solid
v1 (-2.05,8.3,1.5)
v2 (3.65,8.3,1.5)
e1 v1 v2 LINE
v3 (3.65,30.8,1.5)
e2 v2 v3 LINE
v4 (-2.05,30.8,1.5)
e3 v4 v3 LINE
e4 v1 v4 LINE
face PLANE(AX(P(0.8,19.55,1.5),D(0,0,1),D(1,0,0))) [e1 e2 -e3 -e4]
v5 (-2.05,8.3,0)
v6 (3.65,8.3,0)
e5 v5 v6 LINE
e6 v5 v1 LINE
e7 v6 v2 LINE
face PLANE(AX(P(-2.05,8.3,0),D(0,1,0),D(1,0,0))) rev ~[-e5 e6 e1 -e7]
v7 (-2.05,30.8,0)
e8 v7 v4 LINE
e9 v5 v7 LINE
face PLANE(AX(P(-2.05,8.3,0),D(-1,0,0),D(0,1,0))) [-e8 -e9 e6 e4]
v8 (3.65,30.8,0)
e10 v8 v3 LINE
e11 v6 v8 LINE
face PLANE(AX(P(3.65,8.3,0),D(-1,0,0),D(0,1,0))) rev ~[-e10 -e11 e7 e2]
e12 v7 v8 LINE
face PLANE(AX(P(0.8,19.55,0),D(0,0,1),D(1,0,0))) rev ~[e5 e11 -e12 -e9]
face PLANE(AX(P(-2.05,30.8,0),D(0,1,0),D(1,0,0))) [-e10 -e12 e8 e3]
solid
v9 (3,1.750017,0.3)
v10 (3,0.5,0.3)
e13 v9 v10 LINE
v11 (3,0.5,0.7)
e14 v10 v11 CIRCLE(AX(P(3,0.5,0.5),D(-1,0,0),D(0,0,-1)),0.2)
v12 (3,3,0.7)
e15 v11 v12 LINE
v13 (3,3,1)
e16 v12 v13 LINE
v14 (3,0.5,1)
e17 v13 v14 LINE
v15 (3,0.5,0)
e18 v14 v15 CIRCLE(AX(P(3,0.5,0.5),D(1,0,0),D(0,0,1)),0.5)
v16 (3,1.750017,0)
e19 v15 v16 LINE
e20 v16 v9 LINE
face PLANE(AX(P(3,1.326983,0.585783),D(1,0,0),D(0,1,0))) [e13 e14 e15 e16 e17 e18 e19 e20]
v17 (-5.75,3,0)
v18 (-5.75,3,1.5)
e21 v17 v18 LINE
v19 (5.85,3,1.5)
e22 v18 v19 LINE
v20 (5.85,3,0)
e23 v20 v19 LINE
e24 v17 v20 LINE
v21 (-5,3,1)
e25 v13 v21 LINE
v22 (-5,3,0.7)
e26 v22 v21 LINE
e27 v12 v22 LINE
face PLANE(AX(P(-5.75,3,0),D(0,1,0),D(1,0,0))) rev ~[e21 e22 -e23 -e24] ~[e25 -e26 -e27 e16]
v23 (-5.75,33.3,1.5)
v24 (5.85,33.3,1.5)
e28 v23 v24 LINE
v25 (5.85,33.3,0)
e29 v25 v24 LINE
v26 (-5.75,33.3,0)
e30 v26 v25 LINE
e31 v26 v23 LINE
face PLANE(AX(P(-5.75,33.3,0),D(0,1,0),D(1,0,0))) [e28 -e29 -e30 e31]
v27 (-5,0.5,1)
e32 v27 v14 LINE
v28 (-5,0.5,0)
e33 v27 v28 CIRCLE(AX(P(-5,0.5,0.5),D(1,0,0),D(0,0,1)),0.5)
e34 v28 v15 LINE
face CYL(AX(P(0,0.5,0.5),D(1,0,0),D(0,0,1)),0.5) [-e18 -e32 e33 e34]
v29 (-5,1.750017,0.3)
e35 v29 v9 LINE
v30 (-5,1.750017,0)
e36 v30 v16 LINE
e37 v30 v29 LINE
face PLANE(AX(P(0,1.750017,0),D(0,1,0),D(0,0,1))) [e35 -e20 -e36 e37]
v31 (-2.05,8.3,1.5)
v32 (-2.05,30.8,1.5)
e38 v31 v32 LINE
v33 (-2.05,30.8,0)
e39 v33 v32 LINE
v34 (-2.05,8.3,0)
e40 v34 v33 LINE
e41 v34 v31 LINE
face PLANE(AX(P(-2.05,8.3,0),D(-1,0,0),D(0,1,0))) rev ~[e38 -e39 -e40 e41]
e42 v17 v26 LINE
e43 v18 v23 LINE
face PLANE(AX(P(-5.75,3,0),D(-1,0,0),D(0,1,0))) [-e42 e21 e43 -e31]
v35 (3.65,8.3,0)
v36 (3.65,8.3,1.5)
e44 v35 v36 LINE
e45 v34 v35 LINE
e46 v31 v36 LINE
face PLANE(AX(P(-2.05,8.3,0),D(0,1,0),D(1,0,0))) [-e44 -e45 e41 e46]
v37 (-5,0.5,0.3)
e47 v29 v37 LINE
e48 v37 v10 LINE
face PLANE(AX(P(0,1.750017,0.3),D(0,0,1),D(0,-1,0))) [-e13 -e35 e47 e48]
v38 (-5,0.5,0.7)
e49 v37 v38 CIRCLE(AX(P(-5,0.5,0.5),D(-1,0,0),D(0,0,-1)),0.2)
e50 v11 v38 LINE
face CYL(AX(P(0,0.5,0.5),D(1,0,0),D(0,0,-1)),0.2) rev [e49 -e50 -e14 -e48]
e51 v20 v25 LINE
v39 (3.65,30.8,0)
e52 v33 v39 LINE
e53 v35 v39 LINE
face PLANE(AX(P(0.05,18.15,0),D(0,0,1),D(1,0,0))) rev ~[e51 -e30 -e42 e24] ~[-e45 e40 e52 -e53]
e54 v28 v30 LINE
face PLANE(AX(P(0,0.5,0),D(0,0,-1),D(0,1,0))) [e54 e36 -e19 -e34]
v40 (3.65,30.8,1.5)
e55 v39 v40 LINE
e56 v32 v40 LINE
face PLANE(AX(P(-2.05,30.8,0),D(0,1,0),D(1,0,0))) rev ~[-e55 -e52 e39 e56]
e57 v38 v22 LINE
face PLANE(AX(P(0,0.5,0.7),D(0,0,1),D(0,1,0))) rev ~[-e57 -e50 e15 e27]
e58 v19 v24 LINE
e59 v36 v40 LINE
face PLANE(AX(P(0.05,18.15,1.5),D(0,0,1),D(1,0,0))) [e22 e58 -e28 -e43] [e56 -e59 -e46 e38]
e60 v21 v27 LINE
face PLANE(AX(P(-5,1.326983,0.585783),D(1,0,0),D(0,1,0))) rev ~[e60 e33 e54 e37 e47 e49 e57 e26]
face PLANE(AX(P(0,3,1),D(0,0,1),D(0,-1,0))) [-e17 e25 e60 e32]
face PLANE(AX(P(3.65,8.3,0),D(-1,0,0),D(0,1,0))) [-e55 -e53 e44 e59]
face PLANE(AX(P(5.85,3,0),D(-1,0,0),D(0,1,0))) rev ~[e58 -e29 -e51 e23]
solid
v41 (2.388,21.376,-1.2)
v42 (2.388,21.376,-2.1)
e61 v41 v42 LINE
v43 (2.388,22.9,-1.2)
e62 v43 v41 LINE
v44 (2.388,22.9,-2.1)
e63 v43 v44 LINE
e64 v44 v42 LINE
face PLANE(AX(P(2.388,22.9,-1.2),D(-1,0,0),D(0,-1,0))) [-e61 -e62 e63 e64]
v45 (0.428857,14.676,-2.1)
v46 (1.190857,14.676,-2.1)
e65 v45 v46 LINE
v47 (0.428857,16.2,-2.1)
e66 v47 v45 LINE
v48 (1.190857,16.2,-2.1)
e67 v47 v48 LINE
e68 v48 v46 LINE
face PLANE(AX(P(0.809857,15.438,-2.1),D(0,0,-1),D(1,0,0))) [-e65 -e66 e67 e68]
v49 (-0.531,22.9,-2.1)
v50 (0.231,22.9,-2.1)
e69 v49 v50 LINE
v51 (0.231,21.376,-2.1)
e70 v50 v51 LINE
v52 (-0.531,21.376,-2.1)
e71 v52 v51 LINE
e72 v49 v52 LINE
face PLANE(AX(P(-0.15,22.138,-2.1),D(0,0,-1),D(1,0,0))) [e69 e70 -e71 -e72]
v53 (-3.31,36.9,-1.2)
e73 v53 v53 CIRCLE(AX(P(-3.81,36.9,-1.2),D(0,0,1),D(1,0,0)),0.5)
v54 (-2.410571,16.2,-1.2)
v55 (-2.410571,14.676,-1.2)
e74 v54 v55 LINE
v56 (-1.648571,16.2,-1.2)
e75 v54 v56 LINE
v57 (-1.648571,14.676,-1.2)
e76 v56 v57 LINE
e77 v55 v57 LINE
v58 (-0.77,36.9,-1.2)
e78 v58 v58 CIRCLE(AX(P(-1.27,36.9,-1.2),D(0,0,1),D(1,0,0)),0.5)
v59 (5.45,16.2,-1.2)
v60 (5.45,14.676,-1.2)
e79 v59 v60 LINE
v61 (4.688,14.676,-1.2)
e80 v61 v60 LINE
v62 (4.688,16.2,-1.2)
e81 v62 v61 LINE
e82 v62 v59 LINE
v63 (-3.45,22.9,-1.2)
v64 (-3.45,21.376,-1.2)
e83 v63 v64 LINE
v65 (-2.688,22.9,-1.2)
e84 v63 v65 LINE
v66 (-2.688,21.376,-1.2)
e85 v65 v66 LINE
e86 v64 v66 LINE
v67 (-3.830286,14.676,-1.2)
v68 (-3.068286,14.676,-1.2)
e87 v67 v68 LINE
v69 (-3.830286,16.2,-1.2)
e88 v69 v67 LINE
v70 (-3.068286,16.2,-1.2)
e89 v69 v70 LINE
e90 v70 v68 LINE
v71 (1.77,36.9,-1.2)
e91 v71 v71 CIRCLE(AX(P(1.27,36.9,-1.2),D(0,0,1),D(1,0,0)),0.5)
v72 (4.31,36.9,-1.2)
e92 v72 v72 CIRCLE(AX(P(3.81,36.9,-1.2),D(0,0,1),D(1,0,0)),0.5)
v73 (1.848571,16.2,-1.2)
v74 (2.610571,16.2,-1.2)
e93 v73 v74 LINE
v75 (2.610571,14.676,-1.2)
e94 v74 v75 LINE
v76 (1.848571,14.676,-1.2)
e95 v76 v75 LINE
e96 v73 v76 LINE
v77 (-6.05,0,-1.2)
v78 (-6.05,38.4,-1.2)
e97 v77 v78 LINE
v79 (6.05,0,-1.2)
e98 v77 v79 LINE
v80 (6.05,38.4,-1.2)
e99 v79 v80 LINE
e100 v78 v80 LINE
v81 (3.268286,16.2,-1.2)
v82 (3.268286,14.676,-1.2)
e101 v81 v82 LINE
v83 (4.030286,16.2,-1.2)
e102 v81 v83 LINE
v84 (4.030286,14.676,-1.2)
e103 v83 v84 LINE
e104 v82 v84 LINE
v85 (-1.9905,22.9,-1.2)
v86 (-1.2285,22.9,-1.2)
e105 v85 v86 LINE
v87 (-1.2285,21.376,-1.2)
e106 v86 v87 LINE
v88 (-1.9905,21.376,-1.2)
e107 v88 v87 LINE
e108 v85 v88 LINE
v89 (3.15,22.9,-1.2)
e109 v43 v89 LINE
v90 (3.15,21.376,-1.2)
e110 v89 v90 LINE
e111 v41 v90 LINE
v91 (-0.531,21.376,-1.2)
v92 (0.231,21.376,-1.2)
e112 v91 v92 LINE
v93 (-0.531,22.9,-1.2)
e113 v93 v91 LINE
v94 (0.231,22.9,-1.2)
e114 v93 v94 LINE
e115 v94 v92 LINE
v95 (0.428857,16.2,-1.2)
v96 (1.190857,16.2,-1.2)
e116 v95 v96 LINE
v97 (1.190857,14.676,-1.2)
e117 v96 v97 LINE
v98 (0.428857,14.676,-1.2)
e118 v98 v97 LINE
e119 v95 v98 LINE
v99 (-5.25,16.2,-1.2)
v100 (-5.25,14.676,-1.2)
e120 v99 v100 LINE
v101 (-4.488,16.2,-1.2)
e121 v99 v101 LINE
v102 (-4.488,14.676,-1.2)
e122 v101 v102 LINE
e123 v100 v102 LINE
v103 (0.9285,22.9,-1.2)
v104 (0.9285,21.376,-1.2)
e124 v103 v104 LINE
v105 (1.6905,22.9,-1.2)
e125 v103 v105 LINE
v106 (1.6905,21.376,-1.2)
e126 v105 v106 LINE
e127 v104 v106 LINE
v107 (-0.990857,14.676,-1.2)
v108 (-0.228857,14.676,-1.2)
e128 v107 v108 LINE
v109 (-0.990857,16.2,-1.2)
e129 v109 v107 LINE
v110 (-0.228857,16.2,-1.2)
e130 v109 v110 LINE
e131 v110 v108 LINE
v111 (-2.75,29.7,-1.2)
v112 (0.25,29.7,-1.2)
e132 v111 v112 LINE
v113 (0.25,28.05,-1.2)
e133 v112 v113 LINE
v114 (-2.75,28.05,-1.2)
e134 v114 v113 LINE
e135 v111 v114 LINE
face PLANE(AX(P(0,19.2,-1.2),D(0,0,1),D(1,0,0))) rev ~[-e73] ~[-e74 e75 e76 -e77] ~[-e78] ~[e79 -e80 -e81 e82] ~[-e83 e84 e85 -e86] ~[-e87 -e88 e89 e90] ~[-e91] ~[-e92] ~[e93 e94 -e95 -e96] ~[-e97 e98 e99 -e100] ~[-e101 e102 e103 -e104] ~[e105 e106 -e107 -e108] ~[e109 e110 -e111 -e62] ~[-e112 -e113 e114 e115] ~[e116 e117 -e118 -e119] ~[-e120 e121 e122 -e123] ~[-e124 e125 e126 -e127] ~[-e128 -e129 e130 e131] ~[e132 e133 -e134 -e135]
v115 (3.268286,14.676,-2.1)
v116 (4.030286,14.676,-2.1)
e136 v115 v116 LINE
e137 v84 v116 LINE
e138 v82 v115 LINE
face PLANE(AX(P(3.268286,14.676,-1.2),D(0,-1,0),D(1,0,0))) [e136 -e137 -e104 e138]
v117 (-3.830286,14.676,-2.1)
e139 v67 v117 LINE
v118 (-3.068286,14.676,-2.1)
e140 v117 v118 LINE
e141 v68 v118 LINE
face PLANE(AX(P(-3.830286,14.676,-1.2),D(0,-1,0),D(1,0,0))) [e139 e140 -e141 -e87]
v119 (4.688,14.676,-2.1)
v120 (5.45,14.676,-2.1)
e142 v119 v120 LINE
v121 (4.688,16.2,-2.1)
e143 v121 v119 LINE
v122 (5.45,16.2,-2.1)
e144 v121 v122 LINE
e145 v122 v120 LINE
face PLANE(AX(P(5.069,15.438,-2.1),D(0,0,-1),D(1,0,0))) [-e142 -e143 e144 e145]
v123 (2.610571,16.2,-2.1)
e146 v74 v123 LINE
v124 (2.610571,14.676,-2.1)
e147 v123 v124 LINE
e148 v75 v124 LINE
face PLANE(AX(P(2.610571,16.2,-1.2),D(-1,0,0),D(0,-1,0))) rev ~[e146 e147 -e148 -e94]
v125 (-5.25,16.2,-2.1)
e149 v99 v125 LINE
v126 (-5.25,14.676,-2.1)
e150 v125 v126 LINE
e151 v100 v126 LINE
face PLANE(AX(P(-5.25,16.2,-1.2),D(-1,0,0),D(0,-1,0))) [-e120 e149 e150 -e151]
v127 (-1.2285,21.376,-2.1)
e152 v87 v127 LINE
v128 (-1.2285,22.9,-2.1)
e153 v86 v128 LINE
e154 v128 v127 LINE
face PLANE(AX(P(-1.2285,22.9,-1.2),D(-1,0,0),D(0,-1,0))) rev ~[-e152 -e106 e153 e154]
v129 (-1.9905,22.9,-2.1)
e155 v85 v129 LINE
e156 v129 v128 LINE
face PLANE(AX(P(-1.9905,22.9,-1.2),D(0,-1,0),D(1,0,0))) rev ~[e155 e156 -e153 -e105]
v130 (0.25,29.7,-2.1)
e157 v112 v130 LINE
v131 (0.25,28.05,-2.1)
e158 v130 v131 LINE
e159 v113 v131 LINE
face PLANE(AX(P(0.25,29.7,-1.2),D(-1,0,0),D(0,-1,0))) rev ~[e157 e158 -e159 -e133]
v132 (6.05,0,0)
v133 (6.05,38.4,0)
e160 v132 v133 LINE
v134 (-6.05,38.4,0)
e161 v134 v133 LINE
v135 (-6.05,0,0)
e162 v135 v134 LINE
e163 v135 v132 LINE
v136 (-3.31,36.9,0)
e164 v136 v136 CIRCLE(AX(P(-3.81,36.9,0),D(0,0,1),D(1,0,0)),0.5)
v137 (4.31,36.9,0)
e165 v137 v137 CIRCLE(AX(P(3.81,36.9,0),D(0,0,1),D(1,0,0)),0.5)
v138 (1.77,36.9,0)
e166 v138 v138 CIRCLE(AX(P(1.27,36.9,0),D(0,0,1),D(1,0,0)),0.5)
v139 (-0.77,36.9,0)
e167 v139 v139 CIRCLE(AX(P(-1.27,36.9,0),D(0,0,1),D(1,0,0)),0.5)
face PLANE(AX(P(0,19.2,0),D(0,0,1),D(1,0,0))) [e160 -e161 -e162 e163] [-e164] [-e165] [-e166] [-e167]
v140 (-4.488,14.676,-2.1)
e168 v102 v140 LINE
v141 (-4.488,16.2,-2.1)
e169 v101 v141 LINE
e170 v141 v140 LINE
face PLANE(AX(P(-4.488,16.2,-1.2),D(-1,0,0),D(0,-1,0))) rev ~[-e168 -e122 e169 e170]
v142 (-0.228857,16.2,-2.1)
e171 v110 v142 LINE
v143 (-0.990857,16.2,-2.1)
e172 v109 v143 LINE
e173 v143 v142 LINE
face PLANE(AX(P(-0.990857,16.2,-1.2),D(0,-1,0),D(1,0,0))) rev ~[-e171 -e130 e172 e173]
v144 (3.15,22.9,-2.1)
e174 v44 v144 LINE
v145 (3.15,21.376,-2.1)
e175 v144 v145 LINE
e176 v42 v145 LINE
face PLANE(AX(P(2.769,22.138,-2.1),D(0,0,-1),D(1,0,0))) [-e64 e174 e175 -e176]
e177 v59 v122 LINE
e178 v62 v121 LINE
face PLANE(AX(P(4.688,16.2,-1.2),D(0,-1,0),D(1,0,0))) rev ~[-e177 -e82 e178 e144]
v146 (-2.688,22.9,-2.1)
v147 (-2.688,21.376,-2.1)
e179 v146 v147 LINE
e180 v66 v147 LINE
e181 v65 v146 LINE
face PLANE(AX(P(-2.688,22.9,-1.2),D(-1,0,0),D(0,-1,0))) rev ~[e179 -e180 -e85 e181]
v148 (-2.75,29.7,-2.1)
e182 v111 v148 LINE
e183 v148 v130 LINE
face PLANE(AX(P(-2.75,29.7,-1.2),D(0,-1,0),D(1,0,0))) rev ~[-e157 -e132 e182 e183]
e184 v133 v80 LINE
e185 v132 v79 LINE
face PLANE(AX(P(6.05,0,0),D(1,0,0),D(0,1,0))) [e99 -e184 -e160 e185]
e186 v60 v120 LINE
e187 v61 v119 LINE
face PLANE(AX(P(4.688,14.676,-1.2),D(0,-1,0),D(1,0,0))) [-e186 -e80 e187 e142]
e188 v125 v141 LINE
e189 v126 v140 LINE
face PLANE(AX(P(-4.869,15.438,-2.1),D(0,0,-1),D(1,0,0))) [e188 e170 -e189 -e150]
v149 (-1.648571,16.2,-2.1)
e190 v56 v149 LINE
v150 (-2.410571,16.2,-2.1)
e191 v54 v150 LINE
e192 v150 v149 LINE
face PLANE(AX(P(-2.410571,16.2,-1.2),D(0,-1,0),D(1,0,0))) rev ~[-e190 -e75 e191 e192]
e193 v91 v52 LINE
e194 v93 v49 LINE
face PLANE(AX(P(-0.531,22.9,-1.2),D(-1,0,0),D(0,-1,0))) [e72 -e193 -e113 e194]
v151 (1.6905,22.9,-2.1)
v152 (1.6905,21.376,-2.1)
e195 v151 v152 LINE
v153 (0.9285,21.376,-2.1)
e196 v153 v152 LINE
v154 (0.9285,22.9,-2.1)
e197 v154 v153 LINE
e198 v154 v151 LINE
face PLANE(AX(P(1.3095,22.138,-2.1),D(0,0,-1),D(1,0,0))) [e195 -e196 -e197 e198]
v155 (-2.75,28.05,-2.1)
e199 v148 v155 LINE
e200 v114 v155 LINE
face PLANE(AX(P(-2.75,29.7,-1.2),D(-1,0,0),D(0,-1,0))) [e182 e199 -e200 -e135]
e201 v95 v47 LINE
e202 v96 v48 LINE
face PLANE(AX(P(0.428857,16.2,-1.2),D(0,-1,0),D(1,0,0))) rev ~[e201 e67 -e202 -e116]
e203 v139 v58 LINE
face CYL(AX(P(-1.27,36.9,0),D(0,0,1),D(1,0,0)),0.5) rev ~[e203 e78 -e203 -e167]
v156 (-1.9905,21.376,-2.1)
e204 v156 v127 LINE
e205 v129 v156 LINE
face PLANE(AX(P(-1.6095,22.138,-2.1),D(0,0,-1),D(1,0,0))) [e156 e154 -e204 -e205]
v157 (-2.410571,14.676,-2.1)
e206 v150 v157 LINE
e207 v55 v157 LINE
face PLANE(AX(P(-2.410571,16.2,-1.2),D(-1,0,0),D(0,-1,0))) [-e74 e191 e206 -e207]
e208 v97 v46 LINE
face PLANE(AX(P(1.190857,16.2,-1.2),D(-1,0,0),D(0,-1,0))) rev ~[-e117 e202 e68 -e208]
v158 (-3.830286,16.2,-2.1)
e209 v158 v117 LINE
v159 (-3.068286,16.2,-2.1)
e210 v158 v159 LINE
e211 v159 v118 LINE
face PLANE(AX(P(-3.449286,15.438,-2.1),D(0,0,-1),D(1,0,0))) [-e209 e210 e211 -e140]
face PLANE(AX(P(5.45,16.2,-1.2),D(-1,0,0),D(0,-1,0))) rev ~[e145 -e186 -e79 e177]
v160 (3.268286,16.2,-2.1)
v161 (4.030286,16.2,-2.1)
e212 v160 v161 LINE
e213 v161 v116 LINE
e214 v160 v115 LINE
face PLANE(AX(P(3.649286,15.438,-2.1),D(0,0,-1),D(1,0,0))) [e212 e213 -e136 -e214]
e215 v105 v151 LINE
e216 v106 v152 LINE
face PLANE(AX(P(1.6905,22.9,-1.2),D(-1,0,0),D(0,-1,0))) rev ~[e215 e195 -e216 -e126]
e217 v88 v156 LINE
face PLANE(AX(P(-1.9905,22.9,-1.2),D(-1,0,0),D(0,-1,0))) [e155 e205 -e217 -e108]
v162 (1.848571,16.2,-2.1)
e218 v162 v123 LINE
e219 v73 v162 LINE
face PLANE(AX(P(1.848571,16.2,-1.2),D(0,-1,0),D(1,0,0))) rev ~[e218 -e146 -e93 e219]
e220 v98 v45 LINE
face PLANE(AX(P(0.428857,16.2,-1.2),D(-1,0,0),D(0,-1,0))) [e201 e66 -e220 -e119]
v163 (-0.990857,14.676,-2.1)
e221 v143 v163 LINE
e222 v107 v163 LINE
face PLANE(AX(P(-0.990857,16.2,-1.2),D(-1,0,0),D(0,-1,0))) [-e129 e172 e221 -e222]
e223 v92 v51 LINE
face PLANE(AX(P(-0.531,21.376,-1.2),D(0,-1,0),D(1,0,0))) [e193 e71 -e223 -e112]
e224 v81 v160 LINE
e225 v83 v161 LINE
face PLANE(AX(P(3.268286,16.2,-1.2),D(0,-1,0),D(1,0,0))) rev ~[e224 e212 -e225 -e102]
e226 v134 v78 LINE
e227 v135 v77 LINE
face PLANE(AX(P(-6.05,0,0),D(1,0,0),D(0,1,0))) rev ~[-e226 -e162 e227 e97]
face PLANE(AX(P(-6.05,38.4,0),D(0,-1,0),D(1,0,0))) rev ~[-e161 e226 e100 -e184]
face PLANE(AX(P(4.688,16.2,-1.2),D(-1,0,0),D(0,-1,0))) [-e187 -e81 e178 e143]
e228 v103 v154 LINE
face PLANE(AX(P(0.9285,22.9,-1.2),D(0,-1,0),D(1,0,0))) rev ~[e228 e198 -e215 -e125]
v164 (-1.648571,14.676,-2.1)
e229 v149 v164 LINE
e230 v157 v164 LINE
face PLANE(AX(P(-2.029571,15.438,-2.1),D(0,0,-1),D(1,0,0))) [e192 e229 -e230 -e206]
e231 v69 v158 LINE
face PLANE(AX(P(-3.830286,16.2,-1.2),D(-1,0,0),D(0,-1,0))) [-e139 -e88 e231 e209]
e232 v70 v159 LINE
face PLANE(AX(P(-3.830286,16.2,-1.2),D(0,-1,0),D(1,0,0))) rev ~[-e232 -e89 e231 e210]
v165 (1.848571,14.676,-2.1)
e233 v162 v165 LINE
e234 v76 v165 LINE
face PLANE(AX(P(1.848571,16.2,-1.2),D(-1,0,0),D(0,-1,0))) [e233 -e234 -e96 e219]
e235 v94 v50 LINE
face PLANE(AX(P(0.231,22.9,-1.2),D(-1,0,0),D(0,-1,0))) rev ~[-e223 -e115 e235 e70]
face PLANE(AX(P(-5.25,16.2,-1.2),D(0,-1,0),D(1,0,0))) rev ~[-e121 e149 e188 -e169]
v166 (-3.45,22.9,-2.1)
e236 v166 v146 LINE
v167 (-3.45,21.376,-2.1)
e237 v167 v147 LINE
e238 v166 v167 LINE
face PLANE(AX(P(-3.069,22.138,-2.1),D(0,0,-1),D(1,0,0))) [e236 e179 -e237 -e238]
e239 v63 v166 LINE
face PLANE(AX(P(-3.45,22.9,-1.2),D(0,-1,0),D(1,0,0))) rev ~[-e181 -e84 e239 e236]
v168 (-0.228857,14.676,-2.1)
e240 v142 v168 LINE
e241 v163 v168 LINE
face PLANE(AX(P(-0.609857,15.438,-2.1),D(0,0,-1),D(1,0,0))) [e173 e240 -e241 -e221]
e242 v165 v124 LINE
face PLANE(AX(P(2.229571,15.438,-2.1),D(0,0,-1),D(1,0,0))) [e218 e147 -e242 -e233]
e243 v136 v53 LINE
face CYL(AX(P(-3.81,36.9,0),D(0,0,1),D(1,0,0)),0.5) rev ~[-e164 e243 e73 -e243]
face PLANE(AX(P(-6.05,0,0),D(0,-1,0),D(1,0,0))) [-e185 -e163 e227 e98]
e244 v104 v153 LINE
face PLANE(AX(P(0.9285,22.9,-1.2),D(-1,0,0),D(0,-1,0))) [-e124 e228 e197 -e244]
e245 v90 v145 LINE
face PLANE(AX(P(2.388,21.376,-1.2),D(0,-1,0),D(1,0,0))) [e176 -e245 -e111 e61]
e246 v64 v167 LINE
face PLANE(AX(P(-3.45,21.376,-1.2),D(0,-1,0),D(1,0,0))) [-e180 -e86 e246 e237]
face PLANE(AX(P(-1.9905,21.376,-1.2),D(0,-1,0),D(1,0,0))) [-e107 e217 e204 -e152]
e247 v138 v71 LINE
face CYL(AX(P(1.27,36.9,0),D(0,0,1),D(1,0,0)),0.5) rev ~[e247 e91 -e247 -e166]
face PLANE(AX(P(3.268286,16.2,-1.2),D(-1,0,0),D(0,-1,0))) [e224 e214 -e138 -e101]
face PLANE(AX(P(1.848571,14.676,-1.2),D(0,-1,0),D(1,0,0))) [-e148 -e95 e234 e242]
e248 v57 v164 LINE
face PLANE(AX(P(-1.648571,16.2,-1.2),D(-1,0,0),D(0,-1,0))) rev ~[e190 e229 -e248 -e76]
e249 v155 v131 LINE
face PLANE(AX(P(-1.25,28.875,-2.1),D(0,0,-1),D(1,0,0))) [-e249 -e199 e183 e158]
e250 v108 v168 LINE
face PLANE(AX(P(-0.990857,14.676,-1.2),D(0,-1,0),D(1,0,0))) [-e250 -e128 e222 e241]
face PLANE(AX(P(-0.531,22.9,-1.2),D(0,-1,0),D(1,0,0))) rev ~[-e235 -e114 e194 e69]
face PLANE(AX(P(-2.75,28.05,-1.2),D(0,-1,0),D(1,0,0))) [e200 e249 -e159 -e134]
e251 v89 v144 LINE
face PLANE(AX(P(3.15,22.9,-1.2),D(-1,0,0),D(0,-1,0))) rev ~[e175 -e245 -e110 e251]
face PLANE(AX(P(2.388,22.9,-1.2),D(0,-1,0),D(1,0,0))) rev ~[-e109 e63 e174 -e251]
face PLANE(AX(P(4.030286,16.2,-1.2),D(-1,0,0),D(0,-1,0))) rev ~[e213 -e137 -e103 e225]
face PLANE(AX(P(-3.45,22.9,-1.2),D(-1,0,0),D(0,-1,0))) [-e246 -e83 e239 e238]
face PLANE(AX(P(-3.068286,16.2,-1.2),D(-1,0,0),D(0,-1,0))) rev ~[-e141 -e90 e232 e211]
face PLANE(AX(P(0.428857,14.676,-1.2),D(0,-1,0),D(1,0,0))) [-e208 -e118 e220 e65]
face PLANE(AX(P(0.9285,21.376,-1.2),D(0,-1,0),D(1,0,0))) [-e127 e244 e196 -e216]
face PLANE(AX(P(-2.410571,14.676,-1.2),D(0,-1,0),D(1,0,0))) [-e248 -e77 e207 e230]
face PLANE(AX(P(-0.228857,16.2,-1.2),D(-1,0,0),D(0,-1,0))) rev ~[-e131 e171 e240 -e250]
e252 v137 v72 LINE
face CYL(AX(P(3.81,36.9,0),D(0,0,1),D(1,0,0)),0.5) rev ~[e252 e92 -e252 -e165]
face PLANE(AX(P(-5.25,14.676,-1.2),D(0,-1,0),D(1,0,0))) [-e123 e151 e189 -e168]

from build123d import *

# Parameters (mm, degrees)
F0_W          = 12.1
F0_H          = 38.4
F0_R          = 0.5
F1_DEPTH      = 1.2
F2_W          = 11.6
F2_H          = 30.3
F2_W_2        = 5.7
F2_H_2        = 22.5
F3_DEPTH      = 1.5
F4_DEPTH      = 1.5
F6_DEPTH      = 3
F6_DEPTH_BACK = 5
F7_W          = 0.762
F7_H          = 1.524
F7_W_2        = 3
F7_H_2        = 1.65
F8_DEPTH      = 0.9


with BuildPart() as f1:
    # F0 (on Top) → F1 (new body)
    with BuildSketch(Plane.XY):
        with Locations((0, 19.2)):
            Rectangle(F0_W, F0_H)
        with Locations((-3.81, 36.9)):
            Circle(F0_R, mode=Mode.SUBTRACT)
        with Locations((-1.27, 36.9)):
            Circle(F0_R, mode=Mode.SUBTRACT)
        with Locations((1.27, 36.9)):
            Circle(F0_R, mode=Mode.SUBTRACT)
        with Locations((3.81, 36.9)):
            Circle(F0_R, mode=Mode.SUBTRACT)
    extrude(amount=-F1_DEPTH)

    # F7 (on face) → F8 (join)
    with BuildSketch(Plane(origin=(0, 0, -1.2), x_dir=(1, 0, 0), z_dir=(0, 0, -1))):
        with Locations((5.069, -15.438)):
            Rectangle(F7_W, F7_H)
        with Locations((3.6492857143, -15.438)):
            Rectangle(F7_W, F7_H)
        with Locations((2.2295714286, -15.438)):
            Rectangle(F7_W, F7_H)
        with Locations((0.8098571429, -15.438)):
            Rectangle(F7_W, F7_H)
        with Locations((-0.6098571429, -15.438)):
            Rectangle(F7_W, F7_H)
        with Locations((-2.0295714286, -15.438)):
            Rectangle(F7_W, F7_H)
        with Locations((-1.25, -28.875)):
            Rectangle(F7_W_2, F7_H_2)
        with Locations((-3.4492857143, -15.438)):
            Rectangle(F7_W, F7_H)
        with Locations((-4.869, -15.438)):
            Rectangle(F7_W, F7_H)
        with Locations((2.769, -22.138)):
            Rectangle(F7_W, F7_H)
        with Locations((1.3095, -22.138)):
            Rectangle(F7_W, F7_H)
        with Locations((-0.15, -22.138)):
            Rectangle(F7_W, F7_H)
        with Locations((-1.6095, -22.138)):
            Rectangle(F7_W, F7_H)
        with Locations((-3.069, -22.138)):
            Rectangle(F7_W, F7_H)
    extrude(amount=F8_DEPTH)


with BuildPart() as f3:
    # F2 (on Top) → F3 (new body)
    with BuildSketch(Plane.XY):
        with Locations((0.05, 18.15)):
            Rectangle(F2_W, F2_H)
        with Locations((0.8, 19.55)):
            Rectangle(F2_W_2, F2_H_2, mode=Mode.SUBTRACT)
    extrude(amount=F3_DEPTH)

    # F5 (on Right) → F6 (join, two sides)
    with BuildSketch(Plane.YZ) as f6_sk:
        with BuildLine():
            Line((3, 1), (0.5, 1))
            ThreePointArc((0.5, 1), (0, 0.5), (0.5, 0))
            Line((0.5, 0), (1.7500170507, 0))
            Line((1.7500170507, 0), (1.7500170507, 0.3))
            Line((1.7500170507, 0.3), (0.5, 0.3))
            ThreePointArc((0.5, 0.3), (0.3, 0.5), (0.5, 0.7))
            Line((0.5, 0.7), (3, 0.7))
            Line((3, 0.7), (3, 1))
        make_face()
    extrude(amount=F6_DEPTH)
    extrude(f6_sk.sketch, amount=-F6_DEPTH_BACK)


with BuildPart() as f4:
    # F2 (on Top) → F4 (new body, through all)
    with BuildSketch(Plane.XY):
        with Locations((0.8, 19.55)):
            Rectangle(F2_W_2, F2_H_2)
    extrude(amount=F4_DEPTH)


solid = Compound([f1.part, f3.part, f4.part])
